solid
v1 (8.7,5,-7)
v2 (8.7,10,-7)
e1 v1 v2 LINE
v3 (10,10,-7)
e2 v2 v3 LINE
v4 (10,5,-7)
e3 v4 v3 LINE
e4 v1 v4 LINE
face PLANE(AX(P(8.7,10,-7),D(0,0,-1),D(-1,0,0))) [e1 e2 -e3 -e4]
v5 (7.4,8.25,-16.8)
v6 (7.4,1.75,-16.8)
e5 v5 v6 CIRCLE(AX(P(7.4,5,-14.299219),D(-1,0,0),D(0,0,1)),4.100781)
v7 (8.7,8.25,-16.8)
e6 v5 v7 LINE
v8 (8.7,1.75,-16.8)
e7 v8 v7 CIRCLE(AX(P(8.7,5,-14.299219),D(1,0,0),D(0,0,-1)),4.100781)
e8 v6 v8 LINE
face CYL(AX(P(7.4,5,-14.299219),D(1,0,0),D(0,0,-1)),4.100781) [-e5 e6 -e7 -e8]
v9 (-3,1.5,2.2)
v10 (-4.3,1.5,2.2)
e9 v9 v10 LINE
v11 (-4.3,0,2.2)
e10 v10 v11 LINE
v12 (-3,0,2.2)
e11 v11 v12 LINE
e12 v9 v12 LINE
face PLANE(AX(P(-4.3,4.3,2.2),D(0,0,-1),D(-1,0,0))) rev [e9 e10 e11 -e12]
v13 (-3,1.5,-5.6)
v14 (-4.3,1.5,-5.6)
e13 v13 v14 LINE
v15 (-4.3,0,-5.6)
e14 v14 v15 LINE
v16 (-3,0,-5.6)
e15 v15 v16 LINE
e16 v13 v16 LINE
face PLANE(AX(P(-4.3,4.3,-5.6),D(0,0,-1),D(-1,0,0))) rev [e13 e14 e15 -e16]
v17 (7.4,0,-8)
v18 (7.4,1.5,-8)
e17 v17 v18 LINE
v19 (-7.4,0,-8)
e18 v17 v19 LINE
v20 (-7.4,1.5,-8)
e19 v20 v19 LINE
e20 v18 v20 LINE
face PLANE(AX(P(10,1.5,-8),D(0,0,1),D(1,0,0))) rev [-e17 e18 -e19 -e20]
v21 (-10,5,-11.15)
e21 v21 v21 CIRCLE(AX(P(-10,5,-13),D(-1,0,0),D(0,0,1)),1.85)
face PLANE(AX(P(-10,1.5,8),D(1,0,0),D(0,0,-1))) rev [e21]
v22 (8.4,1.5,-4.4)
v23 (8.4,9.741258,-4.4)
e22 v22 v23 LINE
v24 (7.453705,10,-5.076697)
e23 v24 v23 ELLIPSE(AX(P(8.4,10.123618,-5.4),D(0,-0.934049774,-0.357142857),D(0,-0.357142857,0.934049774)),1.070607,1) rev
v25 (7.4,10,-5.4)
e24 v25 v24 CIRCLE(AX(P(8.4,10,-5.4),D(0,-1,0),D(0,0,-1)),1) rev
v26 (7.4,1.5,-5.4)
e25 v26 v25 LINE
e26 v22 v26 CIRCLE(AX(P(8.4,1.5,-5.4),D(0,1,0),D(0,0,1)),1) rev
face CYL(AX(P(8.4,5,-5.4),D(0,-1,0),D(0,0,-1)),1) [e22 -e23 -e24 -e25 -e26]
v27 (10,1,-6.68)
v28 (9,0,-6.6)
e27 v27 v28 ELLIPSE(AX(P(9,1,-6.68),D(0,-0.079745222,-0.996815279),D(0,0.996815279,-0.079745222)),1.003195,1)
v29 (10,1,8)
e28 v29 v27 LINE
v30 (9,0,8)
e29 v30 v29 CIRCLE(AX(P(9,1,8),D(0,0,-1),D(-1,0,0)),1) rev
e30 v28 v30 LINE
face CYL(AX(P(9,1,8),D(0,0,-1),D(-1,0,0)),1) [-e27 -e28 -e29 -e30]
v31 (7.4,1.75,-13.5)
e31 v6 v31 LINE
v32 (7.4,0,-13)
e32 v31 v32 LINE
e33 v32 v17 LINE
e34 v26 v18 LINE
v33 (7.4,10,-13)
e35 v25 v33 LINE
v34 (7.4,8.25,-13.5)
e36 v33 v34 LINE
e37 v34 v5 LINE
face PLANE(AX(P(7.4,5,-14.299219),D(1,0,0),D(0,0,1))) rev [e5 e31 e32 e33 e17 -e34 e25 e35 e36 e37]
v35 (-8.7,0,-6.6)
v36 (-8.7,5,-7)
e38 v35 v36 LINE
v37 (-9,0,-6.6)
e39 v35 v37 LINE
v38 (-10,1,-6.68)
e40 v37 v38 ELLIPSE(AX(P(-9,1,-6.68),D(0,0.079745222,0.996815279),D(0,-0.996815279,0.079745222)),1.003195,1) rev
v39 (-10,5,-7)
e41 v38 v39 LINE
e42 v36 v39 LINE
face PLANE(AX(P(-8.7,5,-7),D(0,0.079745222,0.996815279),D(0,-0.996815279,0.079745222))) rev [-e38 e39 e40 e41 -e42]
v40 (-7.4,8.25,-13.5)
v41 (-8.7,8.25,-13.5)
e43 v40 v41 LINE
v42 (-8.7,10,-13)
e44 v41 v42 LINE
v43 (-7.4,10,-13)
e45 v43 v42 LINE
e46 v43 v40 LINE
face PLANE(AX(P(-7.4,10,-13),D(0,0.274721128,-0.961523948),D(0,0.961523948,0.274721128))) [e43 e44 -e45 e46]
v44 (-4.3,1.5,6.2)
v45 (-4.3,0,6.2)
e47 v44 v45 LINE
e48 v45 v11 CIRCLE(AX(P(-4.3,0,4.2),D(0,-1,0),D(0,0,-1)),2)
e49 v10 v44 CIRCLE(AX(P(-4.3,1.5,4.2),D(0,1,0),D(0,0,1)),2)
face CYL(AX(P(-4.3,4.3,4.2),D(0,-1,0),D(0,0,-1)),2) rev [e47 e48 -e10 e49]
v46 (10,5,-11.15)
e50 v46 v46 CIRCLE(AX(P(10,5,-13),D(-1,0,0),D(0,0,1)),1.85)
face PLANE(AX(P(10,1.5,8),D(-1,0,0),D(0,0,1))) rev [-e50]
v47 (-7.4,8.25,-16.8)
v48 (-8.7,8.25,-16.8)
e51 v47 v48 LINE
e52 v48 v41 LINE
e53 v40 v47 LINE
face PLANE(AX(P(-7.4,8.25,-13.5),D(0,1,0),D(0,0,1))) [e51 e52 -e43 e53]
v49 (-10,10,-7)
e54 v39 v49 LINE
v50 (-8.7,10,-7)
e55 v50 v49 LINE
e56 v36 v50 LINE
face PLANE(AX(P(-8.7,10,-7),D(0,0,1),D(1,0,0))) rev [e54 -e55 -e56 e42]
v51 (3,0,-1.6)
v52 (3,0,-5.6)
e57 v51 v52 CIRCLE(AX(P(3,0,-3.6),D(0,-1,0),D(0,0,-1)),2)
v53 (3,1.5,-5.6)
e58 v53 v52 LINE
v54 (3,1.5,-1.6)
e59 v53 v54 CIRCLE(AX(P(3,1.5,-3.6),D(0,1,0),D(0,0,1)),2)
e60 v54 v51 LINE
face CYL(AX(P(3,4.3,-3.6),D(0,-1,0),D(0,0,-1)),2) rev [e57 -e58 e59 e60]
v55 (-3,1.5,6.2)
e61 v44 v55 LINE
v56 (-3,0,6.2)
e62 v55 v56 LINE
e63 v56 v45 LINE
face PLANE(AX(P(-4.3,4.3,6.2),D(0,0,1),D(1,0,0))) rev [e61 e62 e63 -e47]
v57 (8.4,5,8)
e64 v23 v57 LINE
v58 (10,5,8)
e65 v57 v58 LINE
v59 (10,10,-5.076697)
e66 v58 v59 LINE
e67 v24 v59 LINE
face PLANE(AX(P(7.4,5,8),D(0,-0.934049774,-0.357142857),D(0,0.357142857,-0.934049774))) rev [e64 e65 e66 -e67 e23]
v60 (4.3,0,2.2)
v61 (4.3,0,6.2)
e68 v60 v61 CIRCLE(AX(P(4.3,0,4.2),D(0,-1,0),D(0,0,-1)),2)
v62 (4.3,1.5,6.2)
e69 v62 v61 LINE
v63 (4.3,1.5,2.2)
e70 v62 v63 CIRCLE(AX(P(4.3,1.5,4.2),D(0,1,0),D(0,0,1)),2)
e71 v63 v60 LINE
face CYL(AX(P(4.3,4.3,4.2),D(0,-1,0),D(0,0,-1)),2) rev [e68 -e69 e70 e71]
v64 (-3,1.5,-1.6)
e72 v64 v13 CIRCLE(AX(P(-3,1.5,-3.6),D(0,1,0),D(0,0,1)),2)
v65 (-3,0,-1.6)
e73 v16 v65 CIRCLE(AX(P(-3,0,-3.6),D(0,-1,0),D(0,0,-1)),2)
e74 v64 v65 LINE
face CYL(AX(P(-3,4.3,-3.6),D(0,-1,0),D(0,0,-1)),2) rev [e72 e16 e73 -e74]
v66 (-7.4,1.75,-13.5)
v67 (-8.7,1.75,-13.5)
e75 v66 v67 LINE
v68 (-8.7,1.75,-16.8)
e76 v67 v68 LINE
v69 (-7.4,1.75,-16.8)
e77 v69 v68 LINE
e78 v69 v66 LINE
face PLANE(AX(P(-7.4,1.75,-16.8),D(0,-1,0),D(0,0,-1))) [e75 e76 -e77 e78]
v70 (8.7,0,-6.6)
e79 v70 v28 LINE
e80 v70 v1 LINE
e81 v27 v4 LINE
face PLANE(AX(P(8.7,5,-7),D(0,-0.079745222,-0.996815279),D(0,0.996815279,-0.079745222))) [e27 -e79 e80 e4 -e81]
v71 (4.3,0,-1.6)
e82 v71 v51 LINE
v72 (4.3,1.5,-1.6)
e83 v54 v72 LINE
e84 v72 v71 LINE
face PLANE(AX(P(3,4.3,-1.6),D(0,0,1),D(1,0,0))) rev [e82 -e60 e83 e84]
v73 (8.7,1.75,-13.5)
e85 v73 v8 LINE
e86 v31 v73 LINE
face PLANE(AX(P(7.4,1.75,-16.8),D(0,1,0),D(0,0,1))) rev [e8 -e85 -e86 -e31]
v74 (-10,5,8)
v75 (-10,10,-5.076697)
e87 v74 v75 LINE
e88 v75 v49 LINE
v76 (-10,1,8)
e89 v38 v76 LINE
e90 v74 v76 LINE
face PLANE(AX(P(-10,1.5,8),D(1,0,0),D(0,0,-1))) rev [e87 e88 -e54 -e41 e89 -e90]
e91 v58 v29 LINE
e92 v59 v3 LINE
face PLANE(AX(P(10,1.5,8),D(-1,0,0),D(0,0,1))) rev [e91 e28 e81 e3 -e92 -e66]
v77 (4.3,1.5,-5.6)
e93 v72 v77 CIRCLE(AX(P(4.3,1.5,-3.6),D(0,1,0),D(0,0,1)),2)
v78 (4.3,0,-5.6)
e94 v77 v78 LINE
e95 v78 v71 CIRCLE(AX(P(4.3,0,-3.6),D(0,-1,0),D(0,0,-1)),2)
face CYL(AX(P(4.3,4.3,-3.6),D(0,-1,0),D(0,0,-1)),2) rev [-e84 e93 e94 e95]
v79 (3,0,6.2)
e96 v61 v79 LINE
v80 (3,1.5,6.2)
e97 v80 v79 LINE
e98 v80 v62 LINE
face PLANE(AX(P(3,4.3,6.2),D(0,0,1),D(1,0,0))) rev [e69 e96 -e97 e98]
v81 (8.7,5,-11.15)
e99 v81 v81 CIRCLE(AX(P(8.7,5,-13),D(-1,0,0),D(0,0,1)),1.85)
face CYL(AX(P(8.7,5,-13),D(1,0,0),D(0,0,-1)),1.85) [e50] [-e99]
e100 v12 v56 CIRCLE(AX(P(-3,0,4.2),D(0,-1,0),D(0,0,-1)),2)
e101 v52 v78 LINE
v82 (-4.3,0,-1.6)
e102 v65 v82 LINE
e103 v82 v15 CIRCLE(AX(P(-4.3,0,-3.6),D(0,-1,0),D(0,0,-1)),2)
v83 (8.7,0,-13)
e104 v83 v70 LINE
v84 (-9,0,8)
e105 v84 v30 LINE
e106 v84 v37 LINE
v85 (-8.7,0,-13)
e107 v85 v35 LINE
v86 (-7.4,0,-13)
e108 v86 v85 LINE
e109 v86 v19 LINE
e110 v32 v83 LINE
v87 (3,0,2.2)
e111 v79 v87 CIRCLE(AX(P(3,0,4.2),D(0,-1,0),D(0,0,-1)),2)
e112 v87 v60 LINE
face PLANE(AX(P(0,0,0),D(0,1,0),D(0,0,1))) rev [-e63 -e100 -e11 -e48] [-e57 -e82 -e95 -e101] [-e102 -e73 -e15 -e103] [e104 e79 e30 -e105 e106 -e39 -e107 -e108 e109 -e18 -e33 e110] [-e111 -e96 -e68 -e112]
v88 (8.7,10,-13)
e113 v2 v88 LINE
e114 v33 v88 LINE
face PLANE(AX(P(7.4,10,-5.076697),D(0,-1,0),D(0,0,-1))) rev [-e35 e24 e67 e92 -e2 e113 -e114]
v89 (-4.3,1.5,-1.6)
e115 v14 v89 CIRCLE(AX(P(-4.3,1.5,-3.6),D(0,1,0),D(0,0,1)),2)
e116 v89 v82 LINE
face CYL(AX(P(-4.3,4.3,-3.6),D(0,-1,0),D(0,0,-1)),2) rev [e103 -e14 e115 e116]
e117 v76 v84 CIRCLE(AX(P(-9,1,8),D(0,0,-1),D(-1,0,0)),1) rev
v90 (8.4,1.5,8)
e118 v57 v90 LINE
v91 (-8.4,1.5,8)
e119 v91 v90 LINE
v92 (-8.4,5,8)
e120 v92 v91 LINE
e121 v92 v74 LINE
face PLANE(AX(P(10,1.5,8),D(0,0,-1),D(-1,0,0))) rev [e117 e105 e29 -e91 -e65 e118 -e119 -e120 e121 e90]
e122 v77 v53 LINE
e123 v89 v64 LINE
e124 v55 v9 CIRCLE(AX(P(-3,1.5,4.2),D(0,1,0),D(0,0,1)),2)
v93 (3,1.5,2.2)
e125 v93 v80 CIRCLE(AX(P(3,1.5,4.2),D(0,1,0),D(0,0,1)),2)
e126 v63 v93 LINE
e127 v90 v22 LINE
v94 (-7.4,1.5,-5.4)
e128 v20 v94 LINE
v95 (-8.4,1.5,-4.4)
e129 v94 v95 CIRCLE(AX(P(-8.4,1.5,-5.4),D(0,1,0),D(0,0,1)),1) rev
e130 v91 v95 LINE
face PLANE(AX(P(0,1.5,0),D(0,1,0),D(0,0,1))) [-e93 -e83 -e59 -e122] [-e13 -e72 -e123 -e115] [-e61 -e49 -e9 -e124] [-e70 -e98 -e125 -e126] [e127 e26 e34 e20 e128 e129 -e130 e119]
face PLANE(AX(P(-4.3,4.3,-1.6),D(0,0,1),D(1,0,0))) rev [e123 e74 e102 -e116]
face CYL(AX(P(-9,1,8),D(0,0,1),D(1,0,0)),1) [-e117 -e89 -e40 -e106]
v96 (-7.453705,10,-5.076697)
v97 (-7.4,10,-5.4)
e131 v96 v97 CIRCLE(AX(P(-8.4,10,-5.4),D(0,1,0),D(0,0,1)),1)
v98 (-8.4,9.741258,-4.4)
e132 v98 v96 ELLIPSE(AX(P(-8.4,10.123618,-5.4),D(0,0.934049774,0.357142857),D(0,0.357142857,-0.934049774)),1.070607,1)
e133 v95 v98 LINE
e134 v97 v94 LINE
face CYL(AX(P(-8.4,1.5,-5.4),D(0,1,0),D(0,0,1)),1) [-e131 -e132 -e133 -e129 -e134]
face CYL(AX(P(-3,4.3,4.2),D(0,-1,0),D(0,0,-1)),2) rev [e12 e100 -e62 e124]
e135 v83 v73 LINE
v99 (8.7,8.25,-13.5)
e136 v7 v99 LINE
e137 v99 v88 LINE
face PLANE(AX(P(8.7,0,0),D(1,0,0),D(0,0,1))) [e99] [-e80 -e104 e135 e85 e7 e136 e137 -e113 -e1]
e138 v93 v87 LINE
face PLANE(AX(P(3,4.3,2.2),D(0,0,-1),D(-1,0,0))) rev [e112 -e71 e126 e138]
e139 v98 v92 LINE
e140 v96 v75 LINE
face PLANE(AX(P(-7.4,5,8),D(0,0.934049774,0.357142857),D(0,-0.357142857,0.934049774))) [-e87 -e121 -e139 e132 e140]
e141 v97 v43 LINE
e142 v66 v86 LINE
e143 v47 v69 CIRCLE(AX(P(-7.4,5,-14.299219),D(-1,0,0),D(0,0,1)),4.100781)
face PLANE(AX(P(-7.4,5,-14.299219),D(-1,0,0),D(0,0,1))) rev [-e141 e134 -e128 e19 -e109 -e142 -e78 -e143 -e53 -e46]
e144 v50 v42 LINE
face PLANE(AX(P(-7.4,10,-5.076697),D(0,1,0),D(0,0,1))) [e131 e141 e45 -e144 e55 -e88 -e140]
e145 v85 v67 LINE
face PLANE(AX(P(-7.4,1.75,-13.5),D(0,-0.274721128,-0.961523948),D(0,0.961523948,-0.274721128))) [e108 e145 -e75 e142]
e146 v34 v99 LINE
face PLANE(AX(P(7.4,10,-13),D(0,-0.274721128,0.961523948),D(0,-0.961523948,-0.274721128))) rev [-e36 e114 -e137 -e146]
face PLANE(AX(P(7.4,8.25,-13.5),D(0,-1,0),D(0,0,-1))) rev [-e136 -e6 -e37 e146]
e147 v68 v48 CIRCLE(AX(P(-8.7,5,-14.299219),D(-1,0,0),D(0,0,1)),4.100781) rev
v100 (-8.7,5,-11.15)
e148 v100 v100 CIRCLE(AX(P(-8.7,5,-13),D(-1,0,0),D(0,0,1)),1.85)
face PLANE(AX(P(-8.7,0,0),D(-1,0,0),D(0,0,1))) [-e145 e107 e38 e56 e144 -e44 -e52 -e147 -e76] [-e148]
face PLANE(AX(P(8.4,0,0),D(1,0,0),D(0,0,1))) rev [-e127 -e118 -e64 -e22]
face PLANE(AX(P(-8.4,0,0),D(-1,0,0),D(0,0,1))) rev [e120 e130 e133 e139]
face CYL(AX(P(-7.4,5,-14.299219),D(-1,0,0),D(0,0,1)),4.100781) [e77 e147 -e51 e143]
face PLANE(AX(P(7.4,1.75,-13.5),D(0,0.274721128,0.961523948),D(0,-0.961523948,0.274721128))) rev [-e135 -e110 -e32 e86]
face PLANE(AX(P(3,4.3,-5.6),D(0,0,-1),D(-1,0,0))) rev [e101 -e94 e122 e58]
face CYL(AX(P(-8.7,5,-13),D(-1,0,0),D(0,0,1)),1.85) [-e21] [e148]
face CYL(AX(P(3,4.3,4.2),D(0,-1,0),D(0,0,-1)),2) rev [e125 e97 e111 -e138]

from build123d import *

# Parameters (mm, degrees)
SKETCH1_W           = 20
SKETCH1_H           = 16
BOSS_EXTRUDE1_DEPTH = 1.5
BOSS_EXTRUDE2_DEPTH = 2.6
CUT_EXTRUDE1_DEPTH  = 1
SKETCH4_R           = 1.85
CUT_EXTRUDE2_DEPTH  = 1.3
CUT_EXTRUDE3_DEPTH  = 4.3
FILLET1_R           = 1


with BuildPart() as part:
    # Sketch1 → Boss-Extrude1 (new body)
    with BuildSketch(Plane(origin=(0, 0, 0), x_dir=(1, 0, 0), z_dir=(0, 1, 0))):
        Rectangle(SKETCH1_W, SKETCH1_H)
    extrude(amount=BOSS_EXTRUDE1_DEPTH)

    # Sketch2 → Boss-Extrude2 (add)
    with BuildSketch(Plane.ZY.offset(10)):
        with BuildLine():
            Line((8, 0), (8, 5))
            Line((8, 5), (-5.076696831, 10))
            Line((-5.076696831, 10), (-13, 10))
            Line((-13, 10), (-13.5, 8.25))
            Line((-13.5, 8.25), (-16.8, 8.25))
            ThreePointArc((-16.8, 8.25), (-18.4, 5), (-16.8, 1.75))
            Line((-16.8, 1.75), (-13.5, 1.75))
            Line((-13.5, 1.75), (-13, 0))
            Line((-13, 0), (8, 0))
        make_face()
    boss_extrude2 = extrude(amount=-BOSS_EXTRUDE2_DEPTH)

    # Sketch3 → Cut-Extrude1 (cut)
    with BuildSketch(Plane(origin=(-7.4, 0, 0), x_dir=(0, 0, -1), z_dir=(1, 0, 0))):
        Polygon((-8, 1.5), (4.4, 1.5), (4.4, 9.7412585), (-8, 5), align=None)
    cut_extrude1 = extrude(amount=-CUT_EXTRUDE1_DEPTH, mode=Mode.SUBTRACT)

    # Sketch4 → Cut-Extrude2 (cut)
    with BuildSketch(Plane.ZY.offset(10)):
        Polygon((-18.672915143, 10), (-7, 10), (-7, 5), (-6.6, 0), (-8.743784953, 0), (-18.672915143, 0), align=None)
        with Locations((-13, 5)):
            Circle(SKETCH4_R, mode=Mode.SUBTRACT)
    cut_extrude2 = extrude(amount=-CUT_EXTRUDE2_DEPTH, mode=Mode.SUBTRACT)

    # Mirror1: Boss-Extrude2, Cut-Extrude1, Cut-Extrude2 across plane
    add(boss_extrude2.mirror(Plane(origin=(0, 0, 0), x_dir=(0, 0, 1), z_dir=(1, 0, 0))))
    add(cut_extrude1.mirror(Plane(origin=(0, 0, 0), x_dir=(0, 0, 1), z_dir=(1, 0, 0))), mode=Mode.SUBTRACT)
    add(cut_extrude2.mirror(Plane(origin=(0, 0, 0), x_dir=(0, 0, 1), z_dir=(1, 0, 0))), mode=Mode.SUBTRACT)

    # Sketch5 → Cut-Extrude3 (cut)
    with BuildSketch(Plane.XZ):
        with BuildLine():
            Line((-4.3, 6.2), (-3, 6.2))
            ThreePointArc((-3, 6.2), (-1, 4.2), (-3, 2.2))
            Line((-3, 2.2), (-4.3, 2.2))
            ThreePointArc((-4.3, 2.2), (-6.3, 4.2), (-4.3, 6.2))
        make_face()
        with BuildLine():
            Line((3, 6.2), (4.3, 6.2))
            ThreePointArc((4.3, 6.2), (6.3, 4.2), (4.3, 2.2))
            Line((4.3, 2.2), (3, 2.2))
            ThreePointArc((3, 2.2), (1, 4.2), (3, 6.2))
        make_face()
        with BuildLine():
            Line((-4.3, -1.6), (-3, -1.6))
            ThreePointArc((-3, -1.6), (-1, -3.6), (-3, -5.6))
            Line((-3, -5.6), (-4.3, -5.6))
            ThreePointArc((-4.3, -5.6), (-6.3, -3.6), (-4.3, -1.6))
        make_face()
        with BuildLine():
            Line((3, -1.6), (4.3, -1.6))
            ThreePointArc((4.3, -1.6), (6.3, -3.6), (4.3, -5.6))
            Line((4.3, -5.6), (3, -5.6))
            ThreePointArc((3, -5.6), (1, -3.6), (3, -1.6))
        make_face()
    extrude(amount=-CUT_EXTRUDE3_DEPTH, mode=Mode.SUBTRACT)

    # Fillet1
    fillet1_edges = [part.edges().sort_by_distance(p)[0] for p in [
        (-7.4, 5.62062925, -4.4),
        (10, 0, 0.7),
        (-10, 0, 0.7),
        (7.4, 5.62062925, -4.4),
    ]]
    fillet(fillet1_edges, radius=FILLET1_R - 0.0001)  # a hair under: the kernel refuses the full size


solid = part.part
